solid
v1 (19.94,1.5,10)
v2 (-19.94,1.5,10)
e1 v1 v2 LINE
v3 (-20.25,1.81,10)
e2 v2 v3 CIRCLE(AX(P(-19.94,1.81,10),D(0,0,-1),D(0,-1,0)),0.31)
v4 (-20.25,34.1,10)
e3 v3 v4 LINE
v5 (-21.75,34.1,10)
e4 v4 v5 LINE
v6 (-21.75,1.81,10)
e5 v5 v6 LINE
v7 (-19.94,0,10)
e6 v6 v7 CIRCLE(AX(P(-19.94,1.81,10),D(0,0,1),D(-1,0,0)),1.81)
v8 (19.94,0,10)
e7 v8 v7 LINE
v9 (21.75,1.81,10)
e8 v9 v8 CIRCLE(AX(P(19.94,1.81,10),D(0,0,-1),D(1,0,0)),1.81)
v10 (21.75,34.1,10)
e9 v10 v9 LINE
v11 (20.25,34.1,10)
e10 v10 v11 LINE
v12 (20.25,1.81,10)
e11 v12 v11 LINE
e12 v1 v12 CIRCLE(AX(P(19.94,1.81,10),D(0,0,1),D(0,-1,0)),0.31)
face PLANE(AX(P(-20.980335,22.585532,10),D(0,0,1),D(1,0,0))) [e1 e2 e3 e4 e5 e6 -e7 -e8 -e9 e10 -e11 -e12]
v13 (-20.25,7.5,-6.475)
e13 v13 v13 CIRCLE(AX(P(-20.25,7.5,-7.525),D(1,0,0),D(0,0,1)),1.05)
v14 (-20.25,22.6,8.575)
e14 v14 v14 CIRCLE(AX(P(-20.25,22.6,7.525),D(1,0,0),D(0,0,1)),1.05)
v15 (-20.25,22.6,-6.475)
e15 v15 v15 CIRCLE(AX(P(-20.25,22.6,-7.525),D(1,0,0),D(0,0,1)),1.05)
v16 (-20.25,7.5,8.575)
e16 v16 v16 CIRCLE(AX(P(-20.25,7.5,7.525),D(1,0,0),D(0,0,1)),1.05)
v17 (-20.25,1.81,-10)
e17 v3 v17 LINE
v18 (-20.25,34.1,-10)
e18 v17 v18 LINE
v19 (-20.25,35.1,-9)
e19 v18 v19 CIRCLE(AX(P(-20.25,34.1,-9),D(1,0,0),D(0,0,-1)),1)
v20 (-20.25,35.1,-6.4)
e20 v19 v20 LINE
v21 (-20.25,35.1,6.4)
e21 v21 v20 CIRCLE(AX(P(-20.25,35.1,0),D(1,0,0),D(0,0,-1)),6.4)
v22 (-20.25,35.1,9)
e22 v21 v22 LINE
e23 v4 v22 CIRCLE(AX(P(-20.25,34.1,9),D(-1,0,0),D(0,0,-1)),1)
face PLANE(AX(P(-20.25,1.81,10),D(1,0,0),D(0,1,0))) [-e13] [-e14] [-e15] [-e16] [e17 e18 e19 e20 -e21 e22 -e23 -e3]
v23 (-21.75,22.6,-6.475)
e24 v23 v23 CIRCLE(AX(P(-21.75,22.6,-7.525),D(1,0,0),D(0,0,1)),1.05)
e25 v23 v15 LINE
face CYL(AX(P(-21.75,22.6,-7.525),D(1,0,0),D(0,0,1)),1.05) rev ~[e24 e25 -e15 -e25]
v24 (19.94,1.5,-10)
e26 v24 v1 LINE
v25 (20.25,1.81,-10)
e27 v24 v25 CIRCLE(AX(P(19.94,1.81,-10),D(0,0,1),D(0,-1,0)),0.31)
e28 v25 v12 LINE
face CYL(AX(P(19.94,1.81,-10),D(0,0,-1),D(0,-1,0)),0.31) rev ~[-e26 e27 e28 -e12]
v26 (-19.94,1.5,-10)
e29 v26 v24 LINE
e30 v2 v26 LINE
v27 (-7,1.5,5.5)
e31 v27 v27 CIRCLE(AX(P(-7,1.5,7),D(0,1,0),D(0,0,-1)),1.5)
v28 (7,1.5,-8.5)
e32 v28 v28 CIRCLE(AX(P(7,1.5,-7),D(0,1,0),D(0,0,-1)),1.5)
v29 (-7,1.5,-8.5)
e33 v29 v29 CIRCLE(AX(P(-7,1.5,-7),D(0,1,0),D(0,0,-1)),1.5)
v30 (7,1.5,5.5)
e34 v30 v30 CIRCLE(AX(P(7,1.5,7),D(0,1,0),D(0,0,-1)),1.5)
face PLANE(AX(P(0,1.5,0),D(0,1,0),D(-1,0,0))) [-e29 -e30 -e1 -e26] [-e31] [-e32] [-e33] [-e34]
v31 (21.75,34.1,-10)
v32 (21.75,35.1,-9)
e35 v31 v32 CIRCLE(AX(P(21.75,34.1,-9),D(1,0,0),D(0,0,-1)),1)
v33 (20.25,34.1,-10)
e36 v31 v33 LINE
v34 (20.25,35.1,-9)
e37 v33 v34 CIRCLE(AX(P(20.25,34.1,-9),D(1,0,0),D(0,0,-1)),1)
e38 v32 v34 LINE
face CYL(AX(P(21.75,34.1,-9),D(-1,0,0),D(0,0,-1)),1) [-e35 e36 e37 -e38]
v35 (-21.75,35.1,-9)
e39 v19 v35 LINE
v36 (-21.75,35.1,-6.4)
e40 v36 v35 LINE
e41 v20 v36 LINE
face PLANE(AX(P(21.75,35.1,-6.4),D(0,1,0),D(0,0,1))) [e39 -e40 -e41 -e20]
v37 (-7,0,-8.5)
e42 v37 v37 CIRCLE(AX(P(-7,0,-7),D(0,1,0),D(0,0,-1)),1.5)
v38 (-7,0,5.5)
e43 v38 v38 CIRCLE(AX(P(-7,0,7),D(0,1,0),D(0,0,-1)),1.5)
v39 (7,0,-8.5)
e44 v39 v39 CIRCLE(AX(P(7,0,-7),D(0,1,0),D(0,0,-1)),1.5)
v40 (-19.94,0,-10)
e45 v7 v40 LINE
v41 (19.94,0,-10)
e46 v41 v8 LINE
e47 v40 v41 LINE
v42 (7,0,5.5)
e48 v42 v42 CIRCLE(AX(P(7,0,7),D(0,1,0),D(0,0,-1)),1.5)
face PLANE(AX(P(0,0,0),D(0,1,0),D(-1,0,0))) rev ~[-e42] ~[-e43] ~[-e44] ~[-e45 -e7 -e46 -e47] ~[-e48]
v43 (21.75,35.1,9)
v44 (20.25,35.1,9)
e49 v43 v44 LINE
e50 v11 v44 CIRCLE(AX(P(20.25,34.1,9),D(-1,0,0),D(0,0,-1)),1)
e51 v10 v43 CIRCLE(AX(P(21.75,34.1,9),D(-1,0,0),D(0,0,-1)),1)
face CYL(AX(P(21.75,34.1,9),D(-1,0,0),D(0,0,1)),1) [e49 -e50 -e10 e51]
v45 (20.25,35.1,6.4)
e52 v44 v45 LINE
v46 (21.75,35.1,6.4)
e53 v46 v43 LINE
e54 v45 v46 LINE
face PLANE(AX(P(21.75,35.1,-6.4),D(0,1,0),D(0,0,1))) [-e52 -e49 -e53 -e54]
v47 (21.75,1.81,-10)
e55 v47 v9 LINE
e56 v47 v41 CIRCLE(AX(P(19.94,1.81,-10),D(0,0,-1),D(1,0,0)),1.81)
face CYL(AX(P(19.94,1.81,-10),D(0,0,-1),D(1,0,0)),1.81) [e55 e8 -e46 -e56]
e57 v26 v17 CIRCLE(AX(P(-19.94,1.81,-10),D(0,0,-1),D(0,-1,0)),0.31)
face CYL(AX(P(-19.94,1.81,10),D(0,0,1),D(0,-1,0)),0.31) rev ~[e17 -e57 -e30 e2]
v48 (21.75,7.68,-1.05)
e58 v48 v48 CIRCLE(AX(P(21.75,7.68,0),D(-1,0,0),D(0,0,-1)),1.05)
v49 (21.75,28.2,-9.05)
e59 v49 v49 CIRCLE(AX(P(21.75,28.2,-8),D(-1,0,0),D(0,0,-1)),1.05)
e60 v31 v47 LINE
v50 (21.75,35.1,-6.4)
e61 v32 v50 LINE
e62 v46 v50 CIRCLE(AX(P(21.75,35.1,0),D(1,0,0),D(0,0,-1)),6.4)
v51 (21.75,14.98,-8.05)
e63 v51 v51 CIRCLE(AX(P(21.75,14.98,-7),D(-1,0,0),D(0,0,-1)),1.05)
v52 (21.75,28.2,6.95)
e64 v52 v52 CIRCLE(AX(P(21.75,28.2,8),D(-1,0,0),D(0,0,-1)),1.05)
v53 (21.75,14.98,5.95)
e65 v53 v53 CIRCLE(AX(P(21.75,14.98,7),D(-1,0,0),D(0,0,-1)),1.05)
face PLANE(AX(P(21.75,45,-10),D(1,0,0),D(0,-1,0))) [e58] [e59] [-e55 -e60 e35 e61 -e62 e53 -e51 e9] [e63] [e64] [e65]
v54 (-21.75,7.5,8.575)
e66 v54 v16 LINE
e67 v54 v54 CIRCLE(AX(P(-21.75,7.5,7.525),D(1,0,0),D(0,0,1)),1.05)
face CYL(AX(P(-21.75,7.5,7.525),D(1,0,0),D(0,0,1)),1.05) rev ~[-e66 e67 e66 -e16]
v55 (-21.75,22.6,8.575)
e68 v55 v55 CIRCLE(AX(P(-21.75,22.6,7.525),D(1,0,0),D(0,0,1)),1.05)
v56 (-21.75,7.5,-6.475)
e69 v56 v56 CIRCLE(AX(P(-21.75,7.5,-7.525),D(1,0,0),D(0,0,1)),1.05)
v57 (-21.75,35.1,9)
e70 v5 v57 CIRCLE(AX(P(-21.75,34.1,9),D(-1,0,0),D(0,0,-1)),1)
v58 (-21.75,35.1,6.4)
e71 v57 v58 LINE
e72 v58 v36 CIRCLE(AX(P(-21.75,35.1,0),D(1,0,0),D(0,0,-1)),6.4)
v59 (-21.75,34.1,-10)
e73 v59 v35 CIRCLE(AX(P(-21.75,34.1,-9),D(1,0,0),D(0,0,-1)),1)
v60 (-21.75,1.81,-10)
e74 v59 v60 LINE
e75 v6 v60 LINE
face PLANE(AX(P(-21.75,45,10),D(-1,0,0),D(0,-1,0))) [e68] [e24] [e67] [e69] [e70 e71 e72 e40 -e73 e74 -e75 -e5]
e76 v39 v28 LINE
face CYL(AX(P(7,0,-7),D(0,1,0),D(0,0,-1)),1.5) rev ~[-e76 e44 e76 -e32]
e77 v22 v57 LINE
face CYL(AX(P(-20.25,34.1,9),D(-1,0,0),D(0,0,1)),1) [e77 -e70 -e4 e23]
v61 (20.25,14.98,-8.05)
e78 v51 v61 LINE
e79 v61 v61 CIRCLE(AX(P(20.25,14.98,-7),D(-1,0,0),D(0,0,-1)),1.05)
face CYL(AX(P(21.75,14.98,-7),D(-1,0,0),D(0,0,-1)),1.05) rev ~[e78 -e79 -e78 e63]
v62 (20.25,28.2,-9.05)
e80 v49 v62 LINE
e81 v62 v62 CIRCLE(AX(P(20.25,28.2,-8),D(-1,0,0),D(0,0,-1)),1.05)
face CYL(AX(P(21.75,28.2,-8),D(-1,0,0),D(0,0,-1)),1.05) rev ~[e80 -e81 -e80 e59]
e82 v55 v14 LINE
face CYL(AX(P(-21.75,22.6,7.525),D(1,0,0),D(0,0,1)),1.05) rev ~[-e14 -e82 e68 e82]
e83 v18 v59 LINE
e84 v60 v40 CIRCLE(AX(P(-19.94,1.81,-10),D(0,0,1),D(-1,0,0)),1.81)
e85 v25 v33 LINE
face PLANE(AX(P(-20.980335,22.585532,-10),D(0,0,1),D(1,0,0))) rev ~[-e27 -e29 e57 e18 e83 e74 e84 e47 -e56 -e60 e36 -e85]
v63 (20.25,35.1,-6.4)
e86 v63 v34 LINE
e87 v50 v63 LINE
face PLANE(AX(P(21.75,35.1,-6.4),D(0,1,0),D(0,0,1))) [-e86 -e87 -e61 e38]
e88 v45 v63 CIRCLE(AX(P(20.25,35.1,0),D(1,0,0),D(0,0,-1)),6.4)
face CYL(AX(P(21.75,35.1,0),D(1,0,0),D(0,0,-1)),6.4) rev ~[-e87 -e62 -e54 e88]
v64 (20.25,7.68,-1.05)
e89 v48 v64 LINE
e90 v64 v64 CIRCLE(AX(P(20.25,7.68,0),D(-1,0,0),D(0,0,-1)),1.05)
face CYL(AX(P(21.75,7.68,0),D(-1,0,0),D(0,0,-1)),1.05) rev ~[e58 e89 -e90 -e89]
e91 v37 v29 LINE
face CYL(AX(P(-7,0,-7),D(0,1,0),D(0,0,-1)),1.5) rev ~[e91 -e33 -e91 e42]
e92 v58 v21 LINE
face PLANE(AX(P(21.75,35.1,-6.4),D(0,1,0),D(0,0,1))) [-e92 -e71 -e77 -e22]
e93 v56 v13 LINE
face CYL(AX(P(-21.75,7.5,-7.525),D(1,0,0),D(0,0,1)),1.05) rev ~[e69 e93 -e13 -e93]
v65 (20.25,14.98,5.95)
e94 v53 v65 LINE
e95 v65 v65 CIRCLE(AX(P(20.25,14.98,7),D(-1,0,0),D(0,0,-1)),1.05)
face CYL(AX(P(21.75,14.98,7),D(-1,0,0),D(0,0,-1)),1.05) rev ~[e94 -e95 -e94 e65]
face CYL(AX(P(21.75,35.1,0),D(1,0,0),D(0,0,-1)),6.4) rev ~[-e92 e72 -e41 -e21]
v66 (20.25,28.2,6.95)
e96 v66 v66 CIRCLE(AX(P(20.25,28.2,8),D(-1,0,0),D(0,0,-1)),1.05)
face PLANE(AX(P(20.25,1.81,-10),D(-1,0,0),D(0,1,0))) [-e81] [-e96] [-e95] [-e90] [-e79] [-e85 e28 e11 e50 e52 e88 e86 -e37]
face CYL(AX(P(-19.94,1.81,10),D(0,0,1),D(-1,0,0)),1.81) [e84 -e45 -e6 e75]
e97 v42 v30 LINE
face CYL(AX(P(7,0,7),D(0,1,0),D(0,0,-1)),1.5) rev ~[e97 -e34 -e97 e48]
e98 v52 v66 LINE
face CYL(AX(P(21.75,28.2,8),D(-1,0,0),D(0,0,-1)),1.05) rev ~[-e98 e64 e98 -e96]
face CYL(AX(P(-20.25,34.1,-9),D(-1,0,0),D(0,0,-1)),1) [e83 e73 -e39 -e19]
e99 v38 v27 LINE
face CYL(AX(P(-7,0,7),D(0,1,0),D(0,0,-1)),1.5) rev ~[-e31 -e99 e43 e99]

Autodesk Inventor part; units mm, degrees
ref_plane "YZ Plane" through (0, 0, 0) normal (1, 0, 0) x (0, 1, 0)
ref_plane "XZ Plane" through (0, 0, 0) normal (0, 1, 0) x (-1, 0, 0)
ref_plane "XY Plane" through (0, 0, 0) normal (0, 0, 1) x (1, 0, 0)
sketch "Sketch1" plane through (0, 0, 0) normal (0, 1, 0) x (-1, 0, 0)
  line L0 (20.25, -10) -> (-20.25, -10)
  line L1 (-20.25, -10) -> (-20.25, 10)
  line L2 (-20.25, 10) -> (20.25, 10)
  line L3 (20.25, 10) -> (20.25, -10)
  point P0 (0, 0)
  dimension "d0" = 40.5
  dimension "d1" = 20
  dimension "d2" = 10
  dimension "d3" = 20.25
extrude "Plate1" add sketch "Sketch1" along normal blind 1.5
sketch "Sketch2" plane through (21.75, 0, -10) normal (-1, 0, 0) x (0, -1, 0)
  line L0 (0, 20) -> (0, 0)
  line L1 (0, 0) -> (-45, 0)
  line L2 (-45, 0) -> (-45, 20)
  line L3 (-45, 20) -> (0, 20)
edge flange "Flange1" height 45 angle 90 thickness 1.5 bend radius 0.31 thickness toward (-1, 0, 0) relief tear relief width 1.5 relief depth 0.75 edges at (20.25, 1.5, 0) wall of the first edge with corners at (21.75, 0, 10) (21.75, 0, -10) (21.75, 45, -10) (21.75, 45, 10)
bend "Bend1"
corner "Corner1"
sketch "Sketch3" plane through (-21.75, 0, 10) normal (1, 0, 0) x (0, 1, 0)
  line L0 (0, -20) -> (0, 0)
  line L1 (0, 0) -> (45, 0)
  line L2 (45, 0) -> (45, -20)
  line L3 (45, -20) -> (0, -20)
edge flange "Flange2" height 45 angle 90 thickness 1.5 bend radius 0.31 thickness toward (1, 0, 0) relief tear relief width 1.5 relief depth 0.75 edges at (-20.25, 1.5, 0) wall of the first edge with corners at (-21.75, 0, -10) (-21.75, 0, 10) (-21.75, 45, 10) (-21.75, 45, -10)
bend "Bend2"
corner "Corner2"
sketch "Sketch4" plane through (21.75, 45, 10) normal (1, 0, 0) x (0, 0, -1)
  circle A0 centre (10, -9.9) radius 6.4
  line L0 (0, 0) -> (20, 0) projected
  line L1 (20, 0) -> (20, -43.19) projected
  point P0 (10, -45)
  dimension "d25" = 9.9
  dimension "d26" = 12.8
  dimension "d27" = 10
extrude "Extrusion1" cut sketch "Sketch4" against normal blind 50
sketch "Sketch5" plane through (21.75, 45, 10) normal (1, 0, 0) x (0, 0, -1)
  circle A0 centre (10, -9.9) radius 6.4 projected
  line L0 (0, 0) -> (20, 0) projected
  line L1 (-4, 0) -> (24, 0)
  line L2 (24, 0) -> (24, -9.9)
  line L3 (24, -9.9) -> (-4, -9.9)
  line L4 (-4, -9.9) -> (-4, 0)
  line L5 (0, -43.19) -> (0, 0) projected
  point P0 (10, -45)
  dimension "d30" = 9.9
  dimension "d31" = 28
  dimension "d32" = 4
extrude "Extrusion2" cut sketch "Sketch5" against normal blind 50 contours L3 A0 | A0 L3 L5 L0 L1 L2 | L3 L4 L1 L5 picked at (9.2435, -7.9053)
fillet "Fillet1" radius 1 4 edges at (-21, 35.1, 10) (-21, 35.1, -10) (21, 35.1, -10) (21, 35.1, 10)
sketch "Sketch8" plane through (0, 0, 0) normal (0, -1, 0) x (1, 0, 0)
  circle A0 centre (8, -8) radius 1.05 projected
  circle A1 centre (-8, -8) radius 1.05 projected
  circle A2 centre (8, 8) radius 1.05 projected
  circle A3 centre (-8, 8) radius 1.05 projected
  circle A4 centre (-7, -7) radius 1.5
  line L0 (-9.33, -10.07) -> (7.53, -10.07)
  line L1 (10.07, -8.5) -> (10.07, 29.6)
  circle A5 centre (7, -7) radius 1.5
  circle A6 centre (-7, 7) radius 1.5
  circle A7 centre (7, 7) radius 1.5
  point P0 (0, 0)
  dimension "d71" = 7
  dimension "d72" = 7
  dimension "d73" = 3
  dimension "d76" = 14
  dimension "d79" = 14
hole "Hole3" at (-7, 0, -7) at (-7, 0, 7) at (7, 0, 7) at (7, 0, -7) direction (0, 1, 0) diameter 3 depth 1.5
sketch "Sketch9" plane through (-21.75, 1.81, -10) normal (-1, 0, 0) x (0, 0, 1)
  circle A0 centre (17.525, 20.79) radius 0.7835 projected
  circle A1 centre (17.525, 5.69) radius 0.7835 projected
  circle A2 centre (2.475, 20.79) radius 0.7835 projected
  circle A3 centre (2.475, 5.69) radius 0.7835 projected
  point P0 (10, -1.81)
hole "Hole4" at (-21.75, 7.5, 7.525) at (-21.75, 7.5, -7.525) at (-21.75, 22.6, -7.525) at (-21.75, 22.6, 7.525) direction (1, 0, 0) diameter 2.1 depth 1.5
sketch "Sketch10" plane through (21.75, 1.81, 10) normal (1, 0, 0) x (0, 0, -1)
  circle A0 centre (3, 13.17) radius 0.7835 projected
  circle A1 centre (10, 5.87) radius 0.7835 projected
  circle A2 centre (17, 13.17) radius 0.7835 projected
  circle A3 centre (2, 26.39) radius 0.7835 projected
  circle A4 centre (18, 26.39) radius 0.7835 projected
  point P0 (10, -1.81)
hole "Hole5" at (21.75, 28.2, 8) at (21.75, 28.2, -8) at (21.75, 14.98, -7) at (21.75, 7.68, 0) at (21.75, 14.98, 7) direction (-1, 0, 0) diameter 2.1 depth 1.5
equation "\"d55\" = Thickness"
equation "\"d62\" = Thickness"
equation "\"d69\" = Thickness"
equation "\"d4\" = Thickness"
equation "\"d5\" = BendReliefWidth"
equation "\"d6\" = BendReliefDepth"
equation "\"d7\" = MinimumRemnant"
equation "\"d8\" = TransitionRadius"
equation "\"d11\" = BendRadius"
equation "\"d12\" = CornerReliefSize"
equation "\"d13\" = GapSize"
equation "\"d14\" = JacobiRadiusSize"
equation "\"d15\" = BendReliefWidth"
equation "\"d16\" = BendReliefDepth"
equation "\"d17\" = MinimumRemnant"
equation "\"d18\" = TransitionRadius"
equation "\"d21\" = BendRadius"
equation "\"d22\" = CornerReliefSize"
equation "\"d23\" = GapSize"
equation "\"d24\" = JacobiRadiusSize"
equation "\"BendReliefWidth\" = Thickness"
equation "\"BendReliefDepth\" = 0.5 * Thickness"
equation "\"CornerReliefSize\" = 4 * Thickness"
equation "\"MinimumRemnant\" = 2 * Thickness"
equation "\"TransitionRadius\" = BendRadius"
equation "\"JacobiRadiusSize\" = BendRadius"
equation "\"GapSize\" = Thickness"
equation "\"Thickness\" = 1.5"
equation "\"BendRadius\" = 0.31"
properties part number "axis_10_top_frame" material "Aluminum 6061-AHC"
